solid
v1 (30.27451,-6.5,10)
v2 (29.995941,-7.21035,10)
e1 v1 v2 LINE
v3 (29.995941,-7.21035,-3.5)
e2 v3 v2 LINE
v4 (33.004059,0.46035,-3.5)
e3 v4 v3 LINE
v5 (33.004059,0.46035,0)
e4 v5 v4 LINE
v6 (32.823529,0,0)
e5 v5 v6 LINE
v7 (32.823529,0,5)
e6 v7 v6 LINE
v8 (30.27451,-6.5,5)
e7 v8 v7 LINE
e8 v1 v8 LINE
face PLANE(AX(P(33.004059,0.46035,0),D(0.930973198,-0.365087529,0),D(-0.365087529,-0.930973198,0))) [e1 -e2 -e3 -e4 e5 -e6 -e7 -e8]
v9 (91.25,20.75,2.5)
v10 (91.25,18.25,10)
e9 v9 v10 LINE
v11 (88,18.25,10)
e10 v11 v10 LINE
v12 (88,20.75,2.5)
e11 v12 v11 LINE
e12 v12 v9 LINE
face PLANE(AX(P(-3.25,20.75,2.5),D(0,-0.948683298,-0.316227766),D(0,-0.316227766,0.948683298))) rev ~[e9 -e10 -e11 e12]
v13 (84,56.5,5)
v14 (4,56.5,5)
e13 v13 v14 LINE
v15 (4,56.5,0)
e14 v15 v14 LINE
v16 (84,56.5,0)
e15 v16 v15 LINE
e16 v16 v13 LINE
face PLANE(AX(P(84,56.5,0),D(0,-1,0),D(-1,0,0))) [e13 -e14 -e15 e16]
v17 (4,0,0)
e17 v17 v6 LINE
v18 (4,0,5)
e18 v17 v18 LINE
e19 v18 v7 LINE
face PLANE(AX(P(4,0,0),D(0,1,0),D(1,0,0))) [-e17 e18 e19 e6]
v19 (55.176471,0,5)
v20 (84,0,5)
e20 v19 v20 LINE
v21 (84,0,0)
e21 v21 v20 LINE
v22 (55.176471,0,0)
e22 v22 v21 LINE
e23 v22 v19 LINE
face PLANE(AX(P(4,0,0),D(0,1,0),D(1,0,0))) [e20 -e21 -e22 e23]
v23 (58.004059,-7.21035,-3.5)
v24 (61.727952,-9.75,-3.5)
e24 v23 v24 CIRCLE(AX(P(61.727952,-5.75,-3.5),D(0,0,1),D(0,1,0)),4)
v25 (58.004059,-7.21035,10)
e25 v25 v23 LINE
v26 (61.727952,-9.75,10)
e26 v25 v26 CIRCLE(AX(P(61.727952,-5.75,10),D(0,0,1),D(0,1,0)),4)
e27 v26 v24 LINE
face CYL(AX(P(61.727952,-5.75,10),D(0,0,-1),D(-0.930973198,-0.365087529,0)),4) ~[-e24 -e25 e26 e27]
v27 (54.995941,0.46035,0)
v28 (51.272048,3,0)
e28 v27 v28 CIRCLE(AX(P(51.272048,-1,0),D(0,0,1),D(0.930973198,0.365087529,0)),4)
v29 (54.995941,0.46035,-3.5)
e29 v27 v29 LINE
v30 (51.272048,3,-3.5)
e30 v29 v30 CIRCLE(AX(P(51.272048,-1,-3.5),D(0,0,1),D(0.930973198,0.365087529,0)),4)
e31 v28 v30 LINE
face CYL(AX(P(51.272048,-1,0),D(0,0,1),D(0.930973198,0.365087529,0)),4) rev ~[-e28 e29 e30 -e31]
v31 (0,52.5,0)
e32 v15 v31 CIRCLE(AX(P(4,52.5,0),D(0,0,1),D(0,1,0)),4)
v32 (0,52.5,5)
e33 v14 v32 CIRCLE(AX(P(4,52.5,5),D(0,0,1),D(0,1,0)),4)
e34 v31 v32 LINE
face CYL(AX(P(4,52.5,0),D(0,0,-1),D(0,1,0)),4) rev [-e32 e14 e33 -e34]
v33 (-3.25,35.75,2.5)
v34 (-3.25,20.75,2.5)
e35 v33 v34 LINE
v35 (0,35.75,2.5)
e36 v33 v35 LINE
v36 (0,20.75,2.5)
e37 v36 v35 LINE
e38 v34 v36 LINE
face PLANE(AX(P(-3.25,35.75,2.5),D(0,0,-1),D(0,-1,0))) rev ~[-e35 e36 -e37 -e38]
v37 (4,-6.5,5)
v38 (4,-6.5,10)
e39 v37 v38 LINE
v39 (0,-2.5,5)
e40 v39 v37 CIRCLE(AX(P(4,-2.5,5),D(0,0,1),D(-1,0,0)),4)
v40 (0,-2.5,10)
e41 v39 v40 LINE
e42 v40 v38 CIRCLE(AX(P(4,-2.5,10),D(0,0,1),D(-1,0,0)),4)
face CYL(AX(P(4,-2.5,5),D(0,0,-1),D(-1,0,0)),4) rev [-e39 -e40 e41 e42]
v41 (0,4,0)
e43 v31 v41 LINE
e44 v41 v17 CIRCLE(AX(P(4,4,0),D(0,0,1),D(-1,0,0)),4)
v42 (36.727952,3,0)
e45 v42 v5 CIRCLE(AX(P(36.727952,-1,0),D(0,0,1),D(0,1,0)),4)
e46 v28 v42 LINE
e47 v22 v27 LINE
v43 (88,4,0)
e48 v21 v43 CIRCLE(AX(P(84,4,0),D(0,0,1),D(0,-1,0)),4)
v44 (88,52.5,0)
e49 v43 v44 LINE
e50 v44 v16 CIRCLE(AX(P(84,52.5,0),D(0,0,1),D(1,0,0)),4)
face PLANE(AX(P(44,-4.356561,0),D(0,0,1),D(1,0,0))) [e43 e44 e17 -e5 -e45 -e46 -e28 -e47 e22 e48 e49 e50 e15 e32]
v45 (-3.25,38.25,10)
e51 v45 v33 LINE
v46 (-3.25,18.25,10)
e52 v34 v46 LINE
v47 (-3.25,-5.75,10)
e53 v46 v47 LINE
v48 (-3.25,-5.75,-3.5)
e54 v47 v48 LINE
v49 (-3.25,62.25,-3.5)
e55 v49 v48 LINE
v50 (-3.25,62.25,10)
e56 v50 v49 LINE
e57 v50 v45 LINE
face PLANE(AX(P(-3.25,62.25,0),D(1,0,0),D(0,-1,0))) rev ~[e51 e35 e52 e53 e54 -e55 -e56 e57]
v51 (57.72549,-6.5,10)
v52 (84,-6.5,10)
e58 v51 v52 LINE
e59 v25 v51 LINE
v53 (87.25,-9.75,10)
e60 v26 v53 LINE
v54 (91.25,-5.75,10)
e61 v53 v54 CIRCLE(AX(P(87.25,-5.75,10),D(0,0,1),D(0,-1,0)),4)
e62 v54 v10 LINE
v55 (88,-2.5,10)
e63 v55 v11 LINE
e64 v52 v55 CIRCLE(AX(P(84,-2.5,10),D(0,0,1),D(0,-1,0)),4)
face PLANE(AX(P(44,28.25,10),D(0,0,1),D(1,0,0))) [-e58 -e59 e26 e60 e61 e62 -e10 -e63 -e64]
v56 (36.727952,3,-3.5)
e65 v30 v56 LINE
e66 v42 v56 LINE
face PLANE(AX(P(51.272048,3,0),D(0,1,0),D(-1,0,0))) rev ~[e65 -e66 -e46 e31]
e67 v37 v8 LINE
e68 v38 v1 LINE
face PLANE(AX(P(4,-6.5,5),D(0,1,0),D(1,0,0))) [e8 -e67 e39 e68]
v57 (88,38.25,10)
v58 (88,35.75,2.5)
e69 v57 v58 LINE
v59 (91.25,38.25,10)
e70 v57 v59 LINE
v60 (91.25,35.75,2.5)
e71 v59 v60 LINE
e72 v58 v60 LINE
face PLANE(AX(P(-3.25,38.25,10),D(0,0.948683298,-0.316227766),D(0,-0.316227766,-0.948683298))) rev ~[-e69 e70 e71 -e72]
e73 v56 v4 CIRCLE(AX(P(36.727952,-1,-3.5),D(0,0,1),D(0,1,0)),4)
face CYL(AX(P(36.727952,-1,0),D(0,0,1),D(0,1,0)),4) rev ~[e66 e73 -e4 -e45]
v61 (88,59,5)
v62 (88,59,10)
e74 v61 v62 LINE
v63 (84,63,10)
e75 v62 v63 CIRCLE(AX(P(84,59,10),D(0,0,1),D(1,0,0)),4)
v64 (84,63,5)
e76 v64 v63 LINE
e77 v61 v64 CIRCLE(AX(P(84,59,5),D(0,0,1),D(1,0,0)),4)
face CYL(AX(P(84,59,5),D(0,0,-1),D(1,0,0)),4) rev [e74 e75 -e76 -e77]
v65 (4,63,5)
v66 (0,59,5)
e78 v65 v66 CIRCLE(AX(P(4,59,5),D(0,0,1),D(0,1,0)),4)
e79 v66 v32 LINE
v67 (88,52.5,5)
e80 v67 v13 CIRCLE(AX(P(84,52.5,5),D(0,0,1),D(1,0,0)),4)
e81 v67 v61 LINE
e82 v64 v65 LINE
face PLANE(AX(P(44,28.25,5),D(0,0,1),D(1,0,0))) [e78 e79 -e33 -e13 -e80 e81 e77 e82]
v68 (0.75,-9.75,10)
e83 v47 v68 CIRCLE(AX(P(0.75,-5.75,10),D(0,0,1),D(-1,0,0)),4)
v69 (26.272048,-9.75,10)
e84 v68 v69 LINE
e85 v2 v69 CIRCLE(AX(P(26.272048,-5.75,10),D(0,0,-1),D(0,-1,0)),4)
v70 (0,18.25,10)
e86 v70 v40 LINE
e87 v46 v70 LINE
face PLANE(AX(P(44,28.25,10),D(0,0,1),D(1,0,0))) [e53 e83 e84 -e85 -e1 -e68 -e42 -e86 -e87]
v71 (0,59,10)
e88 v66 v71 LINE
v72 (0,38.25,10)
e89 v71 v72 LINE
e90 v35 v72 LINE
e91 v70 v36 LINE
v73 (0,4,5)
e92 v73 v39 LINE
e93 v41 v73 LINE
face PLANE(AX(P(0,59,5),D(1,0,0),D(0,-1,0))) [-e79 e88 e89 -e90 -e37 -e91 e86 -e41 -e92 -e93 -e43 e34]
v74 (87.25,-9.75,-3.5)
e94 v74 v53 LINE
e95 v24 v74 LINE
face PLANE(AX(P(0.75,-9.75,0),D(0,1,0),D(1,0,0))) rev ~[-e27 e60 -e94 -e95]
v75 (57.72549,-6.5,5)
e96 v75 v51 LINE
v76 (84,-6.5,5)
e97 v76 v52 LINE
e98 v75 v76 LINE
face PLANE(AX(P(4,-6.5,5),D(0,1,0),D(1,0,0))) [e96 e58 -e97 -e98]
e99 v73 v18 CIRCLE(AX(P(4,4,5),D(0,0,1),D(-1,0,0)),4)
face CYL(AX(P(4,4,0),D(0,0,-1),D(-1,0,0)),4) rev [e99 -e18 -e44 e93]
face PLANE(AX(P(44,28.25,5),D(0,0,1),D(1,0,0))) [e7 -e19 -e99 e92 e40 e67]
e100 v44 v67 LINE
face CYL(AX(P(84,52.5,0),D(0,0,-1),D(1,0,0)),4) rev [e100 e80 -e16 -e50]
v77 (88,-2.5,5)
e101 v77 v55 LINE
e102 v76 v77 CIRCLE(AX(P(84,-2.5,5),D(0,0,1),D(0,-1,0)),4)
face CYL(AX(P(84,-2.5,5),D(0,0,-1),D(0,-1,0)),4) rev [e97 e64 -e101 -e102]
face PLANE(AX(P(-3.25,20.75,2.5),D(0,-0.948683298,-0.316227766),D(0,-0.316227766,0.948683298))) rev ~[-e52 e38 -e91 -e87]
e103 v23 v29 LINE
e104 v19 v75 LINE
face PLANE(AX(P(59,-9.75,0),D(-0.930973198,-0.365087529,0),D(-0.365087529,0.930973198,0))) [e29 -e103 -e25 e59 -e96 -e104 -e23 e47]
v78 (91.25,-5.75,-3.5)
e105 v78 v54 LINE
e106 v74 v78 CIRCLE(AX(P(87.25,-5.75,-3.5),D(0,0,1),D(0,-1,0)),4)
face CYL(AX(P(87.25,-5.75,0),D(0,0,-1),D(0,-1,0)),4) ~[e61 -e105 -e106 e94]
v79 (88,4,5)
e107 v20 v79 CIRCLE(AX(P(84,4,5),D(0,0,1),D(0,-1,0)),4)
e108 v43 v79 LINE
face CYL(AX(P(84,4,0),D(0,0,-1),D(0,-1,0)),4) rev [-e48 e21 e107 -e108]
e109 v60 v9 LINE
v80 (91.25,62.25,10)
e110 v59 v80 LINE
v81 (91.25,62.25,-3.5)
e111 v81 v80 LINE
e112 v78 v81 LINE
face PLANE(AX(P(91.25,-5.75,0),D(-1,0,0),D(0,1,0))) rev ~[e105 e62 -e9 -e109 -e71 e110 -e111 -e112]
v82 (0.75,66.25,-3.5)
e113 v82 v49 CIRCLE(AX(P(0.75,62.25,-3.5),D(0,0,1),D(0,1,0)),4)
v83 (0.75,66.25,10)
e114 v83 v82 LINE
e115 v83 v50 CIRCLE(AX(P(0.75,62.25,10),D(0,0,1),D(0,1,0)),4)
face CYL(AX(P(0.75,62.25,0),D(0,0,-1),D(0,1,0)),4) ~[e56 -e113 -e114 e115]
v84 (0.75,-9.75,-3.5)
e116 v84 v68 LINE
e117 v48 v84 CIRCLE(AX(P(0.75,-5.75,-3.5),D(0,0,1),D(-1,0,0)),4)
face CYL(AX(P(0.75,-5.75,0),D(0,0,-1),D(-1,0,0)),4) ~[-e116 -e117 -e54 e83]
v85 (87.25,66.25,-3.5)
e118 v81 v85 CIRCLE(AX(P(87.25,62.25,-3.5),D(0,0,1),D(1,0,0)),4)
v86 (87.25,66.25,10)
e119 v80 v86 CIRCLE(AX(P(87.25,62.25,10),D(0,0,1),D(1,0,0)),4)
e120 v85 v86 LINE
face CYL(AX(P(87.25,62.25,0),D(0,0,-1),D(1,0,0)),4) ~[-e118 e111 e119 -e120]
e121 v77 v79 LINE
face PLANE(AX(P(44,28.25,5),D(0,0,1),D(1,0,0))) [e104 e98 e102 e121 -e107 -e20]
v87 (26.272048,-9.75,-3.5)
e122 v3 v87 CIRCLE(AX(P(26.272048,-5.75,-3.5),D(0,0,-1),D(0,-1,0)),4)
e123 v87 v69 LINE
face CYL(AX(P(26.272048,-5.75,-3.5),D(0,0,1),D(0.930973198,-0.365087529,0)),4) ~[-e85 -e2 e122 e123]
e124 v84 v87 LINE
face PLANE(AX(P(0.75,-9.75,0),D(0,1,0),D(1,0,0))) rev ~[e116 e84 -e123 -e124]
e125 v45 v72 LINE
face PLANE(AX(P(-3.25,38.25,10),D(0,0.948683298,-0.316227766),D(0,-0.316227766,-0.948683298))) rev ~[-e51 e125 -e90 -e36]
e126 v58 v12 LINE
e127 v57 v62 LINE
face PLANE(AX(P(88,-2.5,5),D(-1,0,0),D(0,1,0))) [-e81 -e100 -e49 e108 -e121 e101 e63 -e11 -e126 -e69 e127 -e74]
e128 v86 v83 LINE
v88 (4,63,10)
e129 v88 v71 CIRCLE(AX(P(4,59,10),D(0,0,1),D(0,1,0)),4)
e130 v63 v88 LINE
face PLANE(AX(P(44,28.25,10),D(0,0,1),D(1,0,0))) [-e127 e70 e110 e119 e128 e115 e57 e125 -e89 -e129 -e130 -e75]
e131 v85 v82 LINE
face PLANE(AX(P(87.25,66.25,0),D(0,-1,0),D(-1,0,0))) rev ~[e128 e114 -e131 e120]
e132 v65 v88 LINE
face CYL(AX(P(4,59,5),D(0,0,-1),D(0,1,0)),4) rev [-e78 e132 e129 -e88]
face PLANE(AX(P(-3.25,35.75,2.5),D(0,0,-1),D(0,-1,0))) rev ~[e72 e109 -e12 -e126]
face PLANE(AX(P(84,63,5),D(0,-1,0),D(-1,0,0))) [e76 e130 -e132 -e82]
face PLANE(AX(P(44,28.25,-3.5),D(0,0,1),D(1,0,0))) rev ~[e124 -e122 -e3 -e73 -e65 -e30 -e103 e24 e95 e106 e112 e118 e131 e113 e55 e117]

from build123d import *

# Parameters (mm, degrees)
F2_DEPTH      = 3.5
F2_DEPTH_BACK = 10
F3_DEPTH      = 5
F5_START      = 5
F5_DEPTH      = 5
F7_DEPTH      = 10
F7_DEPTH_BACK = 3.5
F8_R          = 4
F10_DEPTH     = 94.501


with BuildPart() as f2:
    # F1 (on Top) → F2 (new body, two sides)
    with BuildSketch(Plane.XY) as f2_sk:
        with BuildLine():
            ThreePointArc((-3.25, -5.75), (-2.0784271247, -8.5784271247), (0.75, -9.75))
            Line((0.75, -9.75), (87.25, -9.75))
            ThreePointArc((87.25, -9.75), (90.0784271247, -8.5784271247), (91.25, -5.75))
            Line((91.25, -5.75), (91.25, 62.25))
            ThreePointArc((91.25, 62.25), (90.0784271247, 65.0784271247), (87.25, 66.25))
            Line((87.25, 66.25), (0.75, 66.25))
            ThreePointArc((0.75, 66.25), (-2.0784271247, 65.0784271247), (-3.25, 62.25))
            Line((-3.25, 62.25), (-3.25, -5.75))
        make_face()
    extrude(amount=-F2_DEPTH)
    extrude(f2_sk.sketch, amount=F2_DEPTH_BACK)

    # F0 (on Top) → F3 (cut)
    with BuildSketch(Plane.XY):
        with BuildLine():
            ThreePointArc((0, 4), (1.1715728753, 1.1715728753), (4, 0))
            Line((4, 0), (84, 0))
            ThreePointArc((84, 0), (86.8284271247, 1.1715728753), (88, 4))
            Line((88, 4), (88, 52.5))
            ThreePointArc((88, 52.5), (86.8284271247, 55.3284271247), (84, 56.5))
            Line((84, 56.5), (4, 56.5))
            ThreePointArc((4, 56.5), (1.1715728753, 55.3284271247), (0, 52.5))
            Line((0, 52.5), (0, 4))
        make_face()
    extrude(amount=F3_DEPTH, mode=Mode.SUBTRACT)

    # F4 (on Top) → F5 (cut)
    with BuildSketch(Plane.XY.offset(F5_START)):
        with BuildLine():
            ThreePointArc((0, -2.5), (1.1715728753, -5.3284271247), (4, -6.5))
            Line((4, -6.5), (84, -6.5))
            ThreePointArc((84, -6.5), (86.8284271247, -5.3284271247), (88, -2.5))
            Line((88, -2.5), (88, 59))
            ThreePointArc((88, 59), (86.8284271247, 61.8284271247), (84, 63))
            Line((84, 63), (4, 63))
            ThreePointArc((4, 63), (1.1715728753, 61.8284271247), (0, 59))
            Line((0, 59), (0, -2.5))
        make_face()
    extrude(amount=F5_DEPTH, mode=Mode.SUBTRACT)

    # F6 (on Top) → F7 (cut, two sides)
    with BuildSketch(Plane.XY) as f7_sk:
        with BuildLine():
            Line((33.0040588687, 0.4603501153), (29, -9.75))
            Line((29, -9.75), (44, -9.75))
            Line((44, -9.75), (59, -9.75))
            Line((59, -9.75), (54.9959411313, 0.4603501153))
            ThreePointArc((54.9959411313, 0.4603501153), (53.5257785273, 2.3046482764), (51.2720483373, 3))
            Line((51.2720483373, 3), (44, 3))
            Line((44, 3), (36.7279516627, 3))
            ThreePointArc((36.7279516627, 3), (34.4742214727, 2.3046482764), (33.0040588687, 0.4603501153))
        make_face()
    extrude(amount=F7_DEPTH, mode=Mode.SUBTRACT)
    extrude(f7_sk.sketch, amount=-F7_DEPTH_BACK, mode=Mode.SUBTRACT)

    # F8
    f8_edges = [f2.edges().sort_by_distance(p)[0] for p in [
        (59, -9.75, 3.25),
        (29, -9.75, 3.25),
    ]]
    fillet(f8_edges, radius=F8_R)

    # F9 (on face) → F10 (cut, through all)
    with BuildSketch(Plane(origin=(-3.25, 0, 0), x_dir=(0, -1, 0), z_dir=(-1, 0, 0))):
        Polygon((-20.75, 2.5), (-18.25, 10), (-28.25, 10), (-38.25, 10), (-35.75, 2.5), (-28.25, 2.5), align=None)
    extrude(amount=-F10_DEPTH, mode=Mode.SUBTRACT)


solid = f2.part
